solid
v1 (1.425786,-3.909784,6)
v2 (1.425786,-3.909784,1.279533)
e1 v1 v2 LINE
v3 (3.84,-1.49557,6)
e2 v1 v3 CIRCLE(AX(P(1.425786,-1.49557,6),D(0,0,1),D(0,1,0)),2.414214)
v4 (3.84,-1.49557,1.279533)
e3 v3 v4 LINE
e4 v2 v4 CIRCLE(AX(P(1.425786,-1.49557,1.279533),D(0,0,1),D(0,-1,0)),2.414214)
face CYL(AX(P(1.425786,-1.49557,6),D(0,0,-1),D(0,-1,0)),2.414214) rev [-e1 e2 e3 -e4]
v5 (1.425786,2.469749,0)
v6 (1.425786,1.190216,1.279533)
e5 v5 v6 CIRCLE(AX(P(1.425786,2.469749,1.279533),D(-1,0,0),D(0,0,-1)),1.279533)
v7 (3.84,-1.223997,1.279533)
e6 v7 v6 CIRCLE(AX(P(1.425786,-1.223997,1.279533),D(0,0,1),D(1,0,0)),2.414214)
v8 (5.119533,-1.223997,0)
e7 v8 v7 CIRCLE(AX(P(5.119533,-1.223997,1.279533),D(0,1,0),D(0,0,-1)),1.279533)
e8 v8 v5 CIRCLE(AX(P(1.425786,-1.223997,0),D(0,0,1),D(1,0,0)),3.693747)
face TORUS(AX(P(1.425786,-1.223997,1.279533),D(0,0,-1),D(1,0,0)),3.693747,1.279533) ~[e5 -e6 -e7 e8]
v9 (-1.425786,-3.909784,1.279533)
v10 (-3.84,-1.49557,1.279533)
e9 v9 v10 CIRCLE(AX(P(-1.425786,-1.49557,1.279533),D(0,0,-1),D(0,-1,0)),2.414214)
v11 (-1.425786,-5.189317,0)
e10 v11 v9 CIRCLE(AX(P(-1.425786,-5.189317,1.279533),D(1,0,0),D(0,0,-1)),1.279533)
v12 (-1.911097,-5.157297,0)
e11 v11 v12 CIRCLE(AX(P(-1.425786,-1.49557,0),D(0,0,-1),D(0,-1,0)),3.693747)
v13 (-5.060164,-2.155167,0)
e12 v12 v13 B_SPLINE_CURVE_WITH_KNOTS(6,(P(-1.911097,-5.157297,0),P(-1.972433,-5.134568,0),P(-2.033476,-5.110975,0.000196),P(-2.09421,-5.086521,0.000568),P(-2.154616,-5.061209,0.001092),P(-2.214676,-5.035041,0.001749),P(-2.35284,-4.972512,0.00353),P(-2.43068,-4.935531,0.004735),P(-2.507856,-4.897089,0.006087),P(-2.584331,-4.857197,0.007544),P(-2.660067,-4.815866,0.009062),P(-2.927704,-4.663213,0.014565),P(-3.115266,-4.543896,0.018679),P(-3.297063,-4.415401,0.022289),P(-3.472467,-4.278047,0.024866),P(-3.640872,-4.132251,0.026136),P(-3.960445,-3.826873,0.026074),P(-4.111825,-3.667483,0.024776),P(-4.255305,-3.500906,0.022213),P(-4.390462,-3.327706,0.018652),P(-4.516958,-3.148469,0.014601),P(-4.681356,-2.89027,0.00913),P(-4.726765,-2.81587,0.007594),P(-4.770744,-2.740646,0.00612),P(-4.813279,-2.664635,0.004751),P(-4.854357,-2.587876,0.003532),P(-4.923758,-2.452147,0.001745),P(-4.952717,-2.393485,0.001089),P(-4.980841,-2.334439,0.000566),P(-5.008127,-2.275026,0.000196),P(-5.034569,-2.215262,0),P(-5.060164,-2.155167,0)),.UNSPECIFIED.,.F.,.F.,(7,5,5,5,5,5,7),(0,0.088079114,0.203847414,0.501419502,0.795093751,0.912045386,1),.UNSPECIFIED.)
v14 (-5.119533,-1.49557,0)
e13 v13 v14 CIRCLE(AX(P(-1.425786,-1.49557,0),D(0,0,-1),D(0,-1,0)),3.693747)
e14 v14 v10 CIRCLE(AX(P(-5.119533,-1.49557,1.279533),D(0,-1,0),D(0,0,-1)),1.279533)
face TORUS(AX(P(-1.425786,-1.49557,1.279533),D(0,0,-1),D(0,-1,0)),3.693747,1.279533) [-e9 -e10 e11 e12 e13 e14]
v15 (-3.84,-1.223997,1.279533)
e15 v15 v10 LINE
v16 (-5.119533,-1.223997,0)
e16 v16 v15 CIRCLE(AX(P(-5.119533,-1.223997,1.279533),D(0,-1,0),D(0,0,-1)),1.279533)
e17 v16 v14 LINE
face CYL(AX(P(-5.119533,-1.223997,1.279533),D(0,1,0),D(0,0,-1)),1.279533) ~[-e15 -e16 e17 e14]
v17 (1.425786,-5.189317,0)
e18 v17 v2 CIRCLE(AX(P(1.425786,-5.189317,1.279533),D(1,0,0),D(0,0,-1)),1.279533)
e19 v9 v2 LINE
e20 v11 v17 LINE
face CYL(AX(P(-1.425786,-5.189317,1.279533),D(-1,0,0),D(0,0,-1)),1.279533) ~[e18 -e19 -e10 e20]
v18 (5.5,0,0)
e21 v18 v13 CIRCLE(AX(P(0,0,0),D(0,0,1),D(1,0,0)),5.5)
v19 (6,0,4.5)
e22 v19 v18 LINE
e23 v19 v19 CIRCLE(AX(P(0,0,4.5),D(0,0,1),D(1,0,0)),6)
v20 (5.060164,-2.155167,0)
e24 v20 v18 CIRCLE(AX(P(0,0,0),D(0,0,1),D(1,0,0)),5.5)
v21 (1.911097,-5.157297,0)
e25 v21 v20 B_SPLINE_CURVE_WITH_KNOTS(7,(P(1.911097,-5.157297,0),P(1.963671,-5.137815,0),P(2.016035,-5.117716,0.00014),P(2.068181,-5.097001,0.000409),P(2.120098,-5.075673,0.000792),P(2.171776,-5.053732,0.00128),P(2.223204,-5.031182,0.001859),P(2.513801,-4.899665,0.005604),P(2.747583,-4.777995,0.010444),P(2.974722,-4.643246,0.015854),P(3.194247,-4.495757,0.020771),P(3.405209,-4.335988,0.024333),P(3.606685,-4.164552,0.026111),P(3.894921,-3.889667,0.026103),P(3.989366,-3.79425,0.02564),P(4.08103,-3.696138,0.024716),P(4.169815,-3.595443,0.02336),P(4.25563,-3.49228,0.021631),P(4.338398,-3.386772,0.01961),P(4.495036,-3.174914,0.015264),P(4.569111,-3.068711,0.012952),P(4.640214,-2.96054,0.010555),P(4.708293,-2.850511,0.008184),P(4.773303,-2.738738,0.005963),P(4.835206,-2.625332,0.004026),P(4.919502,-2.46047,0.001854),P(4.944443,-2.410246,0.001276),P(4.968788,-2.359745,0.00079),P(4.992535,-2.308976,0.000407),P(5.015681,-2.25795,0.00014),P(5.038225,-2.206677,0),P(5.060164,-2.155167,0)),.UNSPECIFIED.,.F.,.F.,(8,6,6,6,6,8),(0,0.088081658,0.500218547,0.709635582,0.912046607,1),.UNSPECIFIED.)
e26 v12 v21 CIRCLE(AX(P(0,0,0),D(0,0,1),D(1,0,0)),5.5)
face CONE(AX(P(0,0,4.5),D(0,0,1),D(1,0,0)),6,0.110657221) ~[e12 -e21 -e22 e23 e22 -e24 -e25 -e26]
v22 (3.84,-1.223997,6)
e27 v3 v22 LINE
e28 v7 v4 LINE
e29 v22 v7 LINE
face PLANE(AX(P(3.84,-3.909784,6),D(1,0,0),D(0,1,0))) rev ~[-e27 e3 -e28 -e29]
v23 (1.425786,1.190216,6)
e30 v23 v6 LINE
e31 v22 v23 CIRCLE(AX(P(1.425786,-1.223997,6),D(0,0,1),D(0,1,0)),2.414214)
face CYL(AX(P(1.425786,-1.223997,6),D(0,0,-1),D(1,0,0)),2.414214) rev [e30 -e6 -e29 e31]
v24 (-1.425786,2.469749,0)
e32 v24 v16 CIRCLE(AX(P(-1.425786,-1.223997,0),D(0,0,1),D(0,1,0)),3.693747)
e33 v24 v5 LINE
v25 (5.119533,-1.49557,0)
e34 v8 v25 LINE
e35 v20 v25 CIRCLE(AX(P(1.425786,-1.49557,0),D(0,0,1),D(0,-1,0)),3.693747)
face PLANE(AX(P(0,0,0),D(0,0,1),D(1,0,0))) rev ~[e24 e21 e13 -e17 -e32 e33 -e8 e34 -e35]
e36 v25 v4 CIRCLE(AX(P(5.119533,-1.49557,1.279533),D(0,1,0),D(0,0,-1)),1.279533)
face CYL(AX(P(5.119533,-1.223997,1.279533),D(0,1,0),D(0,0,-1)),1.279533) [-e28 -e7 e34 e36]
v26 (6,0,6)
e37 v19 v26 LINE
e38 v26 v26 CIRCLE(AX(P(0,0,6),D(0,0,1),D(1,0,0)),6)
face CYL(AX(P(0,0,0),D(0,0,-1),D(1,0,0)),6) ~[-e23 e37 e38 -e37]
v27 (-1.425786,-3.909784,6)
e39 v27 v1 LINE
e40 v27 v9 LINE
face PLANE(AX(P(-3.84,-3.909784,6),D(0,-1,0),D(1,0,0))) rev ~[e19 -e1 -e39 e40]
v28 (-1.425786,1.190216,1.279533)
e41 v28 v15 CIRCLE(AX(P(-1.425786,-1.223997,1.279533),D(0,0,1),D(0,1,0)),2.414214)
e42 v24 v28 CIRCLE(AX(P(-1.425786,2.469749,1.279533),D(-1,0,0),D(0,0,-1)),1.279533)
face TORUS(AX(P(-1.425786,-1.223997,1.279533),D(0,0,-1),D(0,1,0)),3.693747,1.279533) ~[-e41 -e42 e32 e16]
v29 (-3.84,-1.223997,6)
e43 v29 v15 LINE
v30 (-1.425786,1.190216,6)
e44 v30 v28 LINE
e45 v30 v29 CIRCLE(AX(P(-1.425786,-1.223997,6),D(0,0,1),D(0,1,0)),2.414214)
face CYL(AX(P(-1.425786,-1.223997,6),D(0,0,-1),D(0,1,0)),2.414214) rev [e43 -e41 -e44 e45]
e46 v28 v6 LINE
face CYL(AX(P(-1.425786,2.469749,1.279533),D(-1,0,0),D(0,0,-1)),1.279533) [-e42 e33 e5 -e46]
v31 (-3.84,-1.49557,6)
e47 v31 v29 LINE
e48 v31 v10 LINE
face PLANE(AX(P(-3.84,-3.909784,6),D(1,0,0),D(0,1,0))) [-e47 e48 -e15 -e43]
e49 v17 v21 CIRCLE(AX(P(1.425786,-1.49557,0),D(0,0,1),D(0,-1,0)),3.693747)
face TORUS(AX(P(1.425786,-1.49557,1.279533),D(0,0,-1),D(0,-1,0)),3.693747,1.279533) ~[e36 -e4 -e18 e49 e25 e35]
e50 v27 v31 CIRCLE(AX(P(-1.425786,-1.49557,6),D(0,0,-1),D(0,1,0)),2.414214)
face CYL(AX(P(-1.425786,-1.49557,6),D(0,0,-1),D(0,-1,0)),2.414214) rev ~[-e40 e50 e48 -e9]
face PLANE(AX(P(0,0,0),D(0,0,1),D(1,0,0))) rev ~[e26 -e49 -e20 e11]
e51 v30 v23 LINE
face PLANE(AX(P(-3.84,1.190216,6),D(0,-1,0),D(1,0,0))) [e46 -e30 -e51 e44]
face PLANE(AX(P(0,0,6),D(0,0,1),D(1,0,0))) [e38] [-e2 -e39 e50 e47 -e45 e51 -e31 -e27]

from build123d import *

# Parameters (mm, degrees)
F0_R         = 6
F1_DEPTH     = 6
F2_W         = 7.68
F2_H         = 5.1
F3_DEPTH     = 25
F4_R         = 2.4142135624
F5_SIZE2     = 0.5
F5_SIZE      = 4.5
F6_T1_DEPTH  = 2.8515728753
F6_T3_DEPTH  = 0.2715728753
F6_T6_ANGLE  = 90
F6_T8_ANGLE  = 90
F6_T10_ANGLE = 90
F6_T12_ANGLE = 90


# Not quite as in the source:
# - a fillet or chamfer that OpenCascade refuses, or shapes differently, is made with other operations: its cross-section is extruded or revolved along the edge and cut away or added


with BuildPart() as f1:
    # F0 (on Top) → F1 (new body)
    with BuildSketch(Plane.XY):
        Circle(F0_R)
    extrude(amount=F1_DEPTH)

    # F2 (on face) → F3 (cut)
    with BuildSketch(Plane.XY.offset(6)):
        with Locations((0, -1.3597839279)):
            Rectangle(F2_W, F2_H)
    extrude(amount=-F3_DEPTH, mode=Mode.SUBTRACT)

    # F4
    f4_edges = [f1.edges().sort_by_distance(p)[0] for p in [
        (-3.84, 1.190216, 3),
        (3.84, 1.190216, 3),
        (3.84, -3.909784, 3),
        (-3.84, -3.909784, 3),
    ]]
    fillet(f4_edges, radius=F4_R)

    # F5
    f5_edges = [f1.edges().sort_by_distance(p)[0] for p in [
        (-6, 0, 0),
    ]]
    f5_side = f1.faces().sort_by_distance((-6, 0, 3))[0]
    chamfer(f5_edges, length=F5_SIZE, length2=F5_SIZE2, reference=f5_side)

    # F6: fillet of radius 1.2795331881 on 8 edges, made by hand

    # F6_s2 → F6_t1 (cut)
    with BuildSketch(Plane.YZ.offset(-1.4257864376)):
        with BuildLine():
            ThreePointArc((-5.189317116, 0), (-4.2845505219, 0.374766594), (-3.9097839279, 1.2795331881))
            Line((-3.9097839279, 1.2795331881), (-3.9097839279, 0))
            Line((-3.9097839279, 0), (-5.189317116, 0))
        make_face()
        with BuildLine():
            ThreePointArc((2.4697492601, 0), (1.5649826661, 0.374766594), (1.1902160721, 1.2795331881))
            Line((1.1902160721, 1.2795331881), (1.1902160721, 0))
            Line((1.1902160721, 0), (2.4697492601, 0))
        make_face()
    extrude(amount=F6_T1_DEPTH, mode=Mode.SUBTRACT)

    # F6_s4 → F6_t3 (cut)
    with BuildSketch(Plane.XZ.offset(1.2239974903)):
        with BuildLine():
            ThreePointArc((-5.1195331881, 0), (-4.214766594, 0.374766594), (-3.84, 1.2795331881))
            Line((-3.84, 1.2795331881), (-3.84, 0))
            Line((-3.84, 0), (-5.1195331881, 0))
        make_face()
        with BuildLine():
            ThreePointArc((5.1195331881, 0), (4.214766594, 0.374766594), (3.84, 1.2795331881))
            Line((3.84, 1.2795331881), (3.84, 0))
            Line((3.84, 0), (5.1195331881, 0))
        make_face()
    extrude(amount=F6_T3_DEPTH, mode=Mode.SUBTRACT)

    # F6_s5 → F6_t6 (revolve, cut)
    with BuildSketch(Plane.YZ.offset(-1.4257864376)):
        with BuildLine():
            ThreePointArc((2.4697492601, 0), (1.5649826661, 0.374766594), (1.1902160721, 1.2795331881))
            Line((1.1902160721, 1.2795331881), (1.1902160721, 0))
            Line((1.1902160721, 0), (2.4697492601, 0))
        make_face()
    revolve(axis=Axis((-1.4257864376, -1.2239974903, 0), (0, 0, 1)), revolution_arc=F6_T6_ANGLE, mode=Mode.SUBTRACT)

    # F6_s7 → F6_t8 (revolve, cut)
    with BuildSketch(Plane.YZ.offset(-1.4257864376)):
        with BuildLine():
            ThreePointArc((-5.189317116, 0), (-4.2845505219, 0.374766594), (-3.9097839279, 1.2795331881))
            Line((-3.9097839279, 1.2795331881), (-3.9097839279, 0))
            Line((-3.9097839279, 0), (-5.189317116, 0))
        make_face()
    revolve(axis=Axis((-1.4257864376, -1.4955703655, 0), (0, 0, -1)), revolution_arc=F6_T8_ANGLE, mode=Mode.SUBTRACT)

    # F6_s9 → F6_t10 (revolve, cut)
    with BuildSketch(Plane.YZ.offset(1.4257864376)):
        with BuildLine():
            ThreePointArc((-5.189317116, 0), (-4.2845505219, 0.374766594), (-3.9097839279, 1.2795331881))
            Line((-3.9097839279, 1.2795331881), (-3.9097839279, 0))
            Line((-3.9097839279, 0), (-5.189317116, 0))
        make_face()
    revolve(axis=Axis((1.4257864376, -1.4955703655, 0), (0, 0, 1)), revolution_arc=F6_T10_ANGLE, mode=Mode.SUBTRACT)

    # F6_s11 → F6_t12 (revolve, cut)
    with BuildSketch(Plane.XZ.offset(1.2239974903)):
        with BuildLine():
            ThreePointArc((5.1195331881, 0), (4.214766594, 0.374766594), (3.84, 1.2795331881))
            Line((3.84, 1.2795331881), (3.84, 0))
            Line((3.84, 0), (5.1195331881, 0))
        make_face()
    revolve(axis=Axis((1.4257864376, -1.2239974903, 0), (0, 0, 1)), revolution_arc=F6_T12_ANGLE, mode=Mode.SUBTRACT)


solid = f1.part
